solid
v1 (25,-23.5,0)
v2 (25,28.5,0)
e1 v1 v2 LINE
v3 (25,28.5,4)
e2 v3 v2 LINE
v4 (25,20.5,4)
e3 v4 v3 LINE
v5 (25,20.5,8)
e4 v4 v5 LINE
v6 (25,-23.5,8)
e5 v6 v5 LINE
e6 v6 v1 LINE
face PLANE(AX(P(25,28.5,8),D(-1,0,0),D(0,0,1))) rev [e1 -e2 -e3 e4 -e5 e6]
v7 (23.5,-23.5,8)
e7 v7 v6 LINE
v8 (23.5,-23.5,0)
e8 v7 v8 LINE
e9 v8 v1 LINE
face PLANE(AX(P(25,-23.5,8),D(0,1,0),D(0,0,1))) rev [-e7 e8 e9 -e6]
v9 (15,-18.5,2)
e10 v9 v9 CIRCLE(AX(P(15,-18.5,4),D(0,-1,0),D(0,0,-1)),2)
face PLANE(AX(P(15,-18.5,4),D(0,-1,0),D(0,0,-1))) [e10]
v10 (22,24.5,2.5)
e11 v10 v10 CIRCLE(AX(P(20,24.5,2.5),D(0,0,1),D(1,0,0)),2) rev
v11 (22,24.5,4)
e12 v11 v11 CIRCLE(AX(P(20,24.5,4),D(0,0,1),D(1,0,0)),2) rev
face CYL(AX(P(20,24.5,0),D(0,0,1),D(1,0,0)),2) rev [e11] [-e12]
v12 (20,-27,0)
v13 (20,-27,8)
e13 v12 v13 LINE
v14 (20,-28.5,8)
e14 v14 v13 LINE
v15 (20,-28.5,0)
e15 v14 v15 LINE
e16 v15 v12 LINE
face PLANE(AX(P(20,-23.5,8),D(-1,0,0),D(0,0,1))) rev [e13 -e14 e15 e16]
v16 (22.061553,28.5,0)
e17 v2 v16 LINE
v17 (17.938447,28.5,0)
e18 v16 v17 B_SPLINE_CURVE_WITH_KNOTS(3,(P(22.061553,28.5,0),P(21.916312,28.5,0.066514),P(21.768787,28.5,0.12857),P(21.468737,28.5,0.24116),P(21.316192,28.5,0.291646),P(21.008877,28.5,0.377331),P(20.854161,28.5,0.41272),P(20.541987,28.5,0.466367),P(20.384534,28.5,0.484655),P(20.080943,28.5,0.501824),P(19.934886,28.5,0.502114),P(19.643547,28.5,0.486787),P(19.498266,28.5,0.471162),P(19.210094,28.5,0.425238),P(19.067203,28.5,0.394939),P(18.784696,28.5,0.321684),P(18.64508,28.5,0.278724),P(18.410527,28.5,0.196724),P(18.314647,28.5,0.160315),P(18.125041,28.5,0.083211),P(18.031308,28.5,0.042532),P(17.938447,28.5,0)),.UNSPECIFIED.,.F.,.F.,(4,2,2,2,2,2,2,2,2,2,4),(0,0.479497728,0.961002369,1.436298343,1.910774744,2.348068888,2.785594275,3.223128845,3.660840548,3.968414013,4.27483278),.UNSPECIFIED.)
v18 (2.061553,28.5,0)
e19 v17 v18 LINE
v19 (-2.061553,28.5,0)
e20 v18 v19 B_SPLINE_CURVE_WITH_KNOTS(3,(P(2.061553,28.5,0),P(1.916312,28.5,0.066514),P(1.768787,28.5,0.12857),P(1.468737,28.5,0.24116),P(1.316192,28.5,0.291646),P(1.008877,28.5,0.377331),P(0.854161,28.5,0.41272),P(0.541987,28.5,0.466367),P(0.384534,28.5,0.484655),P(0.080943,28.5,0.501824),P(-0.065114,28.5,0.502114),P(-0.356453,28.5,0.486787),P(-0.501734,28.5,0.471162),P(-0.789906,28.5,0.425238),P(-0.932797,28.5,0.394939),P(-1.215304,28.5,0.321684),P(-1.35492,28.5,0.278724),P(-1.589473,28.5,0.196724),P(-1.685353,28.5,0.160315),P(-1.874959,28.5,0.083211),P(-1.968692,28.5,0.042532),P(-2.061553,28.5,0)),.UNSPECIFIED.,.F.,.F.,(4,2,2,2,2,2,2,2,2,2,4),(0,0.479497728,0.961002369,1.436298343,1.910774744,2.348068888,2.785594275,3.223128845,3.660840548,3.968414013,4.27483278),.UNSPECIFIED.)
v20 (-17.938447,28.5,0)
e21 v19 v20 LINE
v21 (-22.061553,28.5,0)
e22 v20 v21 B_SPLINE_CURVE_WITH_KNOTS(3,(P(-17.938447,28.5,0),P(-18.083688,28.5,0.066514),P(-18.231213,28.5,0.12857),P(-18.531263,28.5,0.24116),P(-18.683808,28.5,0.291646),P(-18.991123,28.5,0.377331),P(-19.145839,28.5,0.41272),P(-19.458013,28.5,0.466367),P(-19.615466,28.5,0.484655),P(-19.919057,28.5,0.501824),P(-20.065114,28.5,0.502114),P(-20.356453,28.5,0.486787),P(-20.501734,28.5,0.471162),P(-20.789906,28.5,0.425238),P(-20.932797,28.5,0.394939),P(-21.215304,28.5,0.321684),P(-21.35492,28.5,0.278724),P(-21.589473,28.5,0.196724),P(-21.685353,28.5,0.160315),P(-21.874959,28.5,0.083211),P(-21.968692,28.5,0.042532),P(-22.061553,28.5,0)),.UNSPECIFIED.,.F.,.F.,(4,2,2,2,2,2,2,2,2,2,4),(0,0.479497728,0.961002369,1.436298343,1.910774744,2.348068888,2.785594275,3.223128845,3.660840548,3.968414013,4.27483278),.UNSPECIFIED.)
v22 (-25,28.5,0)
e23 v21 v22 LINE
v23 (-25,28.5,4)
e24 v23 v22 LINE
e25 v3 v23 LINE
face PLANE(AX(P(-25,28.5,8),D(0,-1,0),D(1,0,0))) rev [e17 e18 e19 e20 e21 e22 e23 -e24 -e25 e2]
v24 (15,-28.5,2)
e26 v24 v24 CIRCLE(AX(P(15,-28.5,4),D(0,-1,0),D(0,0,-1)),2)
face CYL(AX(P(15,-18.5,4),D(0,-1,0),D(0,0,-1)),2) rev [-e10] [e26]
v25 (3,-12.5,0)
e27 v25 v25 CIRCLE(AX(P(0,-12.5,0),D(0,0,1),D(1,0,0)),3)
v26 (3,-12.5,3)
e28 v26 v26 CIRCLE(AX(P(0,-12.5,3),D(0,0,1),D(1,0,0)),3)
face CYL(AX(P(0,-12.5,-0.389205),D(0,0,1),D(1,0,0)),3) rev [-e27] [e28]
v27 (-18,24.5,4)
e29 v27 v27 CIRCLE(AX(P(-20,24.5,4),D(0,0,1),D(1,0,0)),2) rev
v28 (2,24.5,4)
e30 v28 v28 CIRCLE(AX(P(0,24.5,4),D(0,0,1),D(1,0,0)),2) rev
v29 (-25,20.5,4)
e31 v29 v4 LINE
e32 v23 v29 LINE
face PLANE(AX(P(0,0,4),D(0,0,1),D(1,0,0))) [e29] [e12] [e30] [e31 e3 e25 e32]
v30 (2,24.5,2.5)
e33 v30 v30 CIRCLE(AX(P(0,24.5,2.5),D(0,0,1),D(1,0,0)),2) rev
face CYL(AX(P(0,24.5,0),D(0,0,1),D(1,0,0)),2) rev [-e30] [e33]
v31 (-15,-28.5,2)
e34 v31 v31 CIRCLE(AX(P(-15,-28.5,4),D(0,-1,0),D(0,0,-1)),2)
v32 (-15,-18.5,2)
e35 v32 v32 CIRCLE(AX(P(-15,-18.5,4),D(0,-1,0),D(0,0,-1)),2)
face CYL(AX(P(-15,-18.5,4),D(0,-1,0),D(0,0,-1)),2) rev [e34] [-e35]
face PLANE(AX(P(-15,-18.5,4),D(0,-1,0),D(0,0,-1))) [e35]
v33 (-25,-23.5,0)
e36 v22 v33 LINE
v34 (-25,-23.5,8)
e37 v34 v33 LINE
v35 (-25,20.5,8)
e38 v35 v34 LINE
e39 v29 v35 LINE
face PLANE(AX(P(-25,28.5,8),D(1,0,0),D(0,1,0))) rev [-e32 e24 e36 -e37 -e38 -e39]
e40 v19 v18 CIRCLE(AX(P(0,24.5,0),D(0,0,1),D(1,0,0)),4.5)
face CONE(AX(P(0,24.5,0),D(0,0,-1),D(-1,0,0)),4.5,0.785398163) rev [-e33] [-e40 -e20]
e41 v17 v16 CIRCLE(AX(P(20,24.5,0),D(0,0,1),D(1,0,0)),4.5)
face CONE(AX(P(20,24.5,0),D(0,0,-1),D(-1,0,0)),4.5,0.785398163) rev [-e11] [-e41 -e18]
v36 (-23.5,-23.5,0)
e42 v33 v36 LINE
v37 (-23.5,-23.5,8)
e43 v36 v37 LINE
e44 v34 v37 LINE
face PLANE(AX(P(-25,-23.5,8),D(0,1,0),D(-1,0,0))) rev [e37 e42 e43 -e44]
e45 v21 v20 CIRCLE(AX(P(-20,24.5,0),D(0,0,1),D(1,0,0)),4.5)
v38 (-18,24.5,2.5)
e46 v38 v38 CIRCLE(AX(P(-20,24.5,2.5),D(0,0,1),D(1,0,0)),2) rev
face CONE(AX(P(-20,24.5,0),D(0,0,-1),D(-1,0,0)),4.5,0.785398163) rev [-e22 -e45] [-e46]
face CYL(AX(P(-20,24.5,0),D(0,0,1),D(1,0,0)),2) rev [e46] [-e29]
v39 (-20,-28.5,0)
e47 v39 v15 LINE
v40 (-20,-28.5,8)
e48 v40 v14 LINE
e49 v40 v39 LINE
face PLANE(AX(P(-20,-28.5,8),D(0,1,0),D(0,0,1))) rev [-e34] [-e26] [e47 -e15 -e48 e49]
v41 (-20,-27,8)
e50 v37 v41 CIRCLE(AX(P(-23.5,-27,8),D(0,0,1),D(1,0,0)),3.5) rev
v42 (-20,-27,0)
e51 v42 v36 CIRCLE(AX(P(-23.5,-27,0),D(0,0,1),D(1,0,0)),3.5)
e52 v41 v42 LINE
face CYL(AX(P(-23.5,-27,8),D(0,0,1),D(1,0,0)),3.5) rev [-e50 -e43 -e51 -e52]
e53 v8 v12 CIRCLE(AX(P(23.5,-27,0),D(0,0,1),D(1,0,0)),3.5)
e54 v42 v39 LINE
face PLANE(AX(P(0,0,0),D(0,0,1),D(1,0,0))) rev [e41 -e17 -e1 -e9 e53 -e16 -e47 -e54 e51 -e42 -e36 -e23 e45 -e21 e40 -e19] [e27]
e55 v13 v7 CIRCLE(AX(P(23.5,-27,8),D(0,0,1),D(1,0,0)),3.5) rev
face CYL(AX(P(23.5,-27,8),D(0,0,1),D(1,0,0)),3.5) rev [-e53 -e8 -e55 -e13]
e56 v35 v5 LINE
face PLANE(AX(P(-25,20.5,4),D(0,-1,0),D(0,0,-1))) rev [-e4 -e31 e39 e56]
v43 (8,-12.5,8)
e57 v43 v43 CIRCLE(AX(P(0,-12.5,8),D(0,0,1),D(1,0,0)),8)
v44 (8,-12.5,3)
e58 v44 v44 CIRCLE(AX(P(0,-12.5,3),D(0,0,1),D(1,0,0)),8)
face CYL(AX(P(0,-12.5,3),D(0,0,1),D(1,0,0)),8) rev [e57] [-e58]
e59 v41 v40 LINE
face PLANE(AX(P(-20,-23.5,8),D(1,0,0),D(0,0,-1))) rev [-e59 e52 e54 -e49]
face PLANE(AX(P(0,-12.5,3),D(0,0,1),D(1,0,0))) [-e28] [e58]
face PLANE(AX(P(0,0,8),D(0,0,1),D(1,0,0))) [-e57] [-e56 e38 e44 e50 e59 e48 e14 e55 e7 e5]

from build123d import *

# Parameters (mm, degrees)
BOSS_EXTRU_1_DEPTH      = 8
ESQUISSE2_R             = 2
ENL_V_MAT_EXTRU_1_DEPTH = 10
ESQUISSE3_R             = 2
ENL_V_MAT_EXTRU_2_DEPTH = 39.745967532
CHANFREIN1_SIZE         = 2.5
ESQUISSE4_R             = 8
ENL_V_MAT_EXTRU_3_DEPTH = 5
ESQUISSE5_R             = 3
ENL_V_MAT_EXTRU_4_DEPTH = 39.23937761
ESQUISSE6_W             = 50
ESQUISSE6_H             = 8
ENL_V_MAT_EXTRU_5_DEPTH = 4
CONG_1_R                = 3.5


with BuildPart() as part:
    # Esquisse1 → Boss.-Extru.1 (new body)
    with BuildSketch(Plane.XY):
        Polygon((-25, -23.5), (-20, -23.5), (-20, -28.5), (20, -28.5), (20, -23.5), (25, -23.5), (25, 28.5), (-25, 28.5), align=None)
    extrude(amount=BOSS_EXTRU_1_DEPTH)

    # Esquisse2 → Enlèv. mat.-Extru.1 (cut)
    with BuildSketch(Plane.XZ.offset(28.5)):
        with Locations(Location((-15, 4, 0), (0, 0, 270))):
            Circle(ESQUISSE2_R)
        with Locations(Location((15, 4, 0), (0, 0, 270))):
            Circle(ESQUISSE2_R)
    extrude(amount=-ENL_V_MAT_EXTRU_1_DEPTH, mode=Mode.SUBTRACT)

    # Esquisse3 → Enlèv. mat.-Extru.2 (cut, through all)
    with BuildSketch(Plane.XY.offset(8)):
        with Locations((-20, 24.5)):
            Circle(ESQUISSE3_R)
        with Locations((20, 24.5)):
            Circle(ESQUISSE3_R)
        with Locations((0, 24.5)):
            Circle(ESQUISSE3_R)
    extrude(amount=-ENL_V_MAT_EXTRU_2_DEPTH, mode=Mode.SUBTRACT)

    # Chanfrein1
    # the kernel refuses this chamfer: 2.5 mm, written as the material it takes off along each edge
    with BuildSketch(Plane(origin=(-20, 24.5, 0), x_dir=(1, 0, 0), z_dir=(0, -1, 0))) as chanfrein1_piece_1:
        Polygon((2 + CHANFREIN1_SIZE, 0), (2, CHANFREIN1_SIZE), (2, 0), align=None)
    revolve(axis=Axis((-20, 24.5, 0), (0, 0, 1)), mode=Mode.SUBTRACT)
    with BuildSketch(Plane(origin=(20, 24.5, 0), x_dir=(1, 0, 0), z_dir=(0, -1, 0))) as chanfrein1_piece_2:
        Polygon((2 + CHANFREIN1_SIZE, 0), (2, CHANFREIN1_SIZE), (2, 0), align=None)
    revolve(axis=Axis((20, 24.5, 0), (0, 0, 1)), mode=Mode.SUBTRACT)
    with BuildSketch(Plane(origin=(0, 24.5, 0), x_dir=(1, 0, 0), z_dir=(0, -1, 0))) as chanfrein1_piece_3:
        Polygon((2 + CHANFREIN1_SIZE, 0), (2, CHANFREIN1_SIZE), (2, 0), align=None)
    revolve(axis=Axis((0, 24.5, 0), (0, 0, 1)), mode=Mode.SUBTRACT)

    # Esquisse4 → Enlèv. mat.-Extru.3 (cut)
    with BuildSketch(Plane.XY.offset(8)):
        with Locations((0, -12.5)):
            Circle(ESQUISSE4_R)
    extrude(amount=-ENL_V_MAT_EXTRU_3_DEPTH, mode=Mode.SUBTRACT)

    # Esquisse5 → Enlèv. mat.-Extru.4 (cut, through all)
    with BuildSketch(Plane.XY.offset(3)):
        with Locations((0, -12.5)):
            Circle(ESQUISSE5_R)
    extrude(amount=-ENL_V_MAT_EXTRU_4_DEPTH, mode=Mode.SUBTRACT)

    # Esquisse6 → Enlèv. mat.-Extru.5 (cut)
    with BuildSketch(Plane.XY.offset(8)):
        with Locations((0, 24.5)):
            Rectangle(ESQUISSE6_W, ESQUISSE6_H)
    extrude(amount=-ENL_V_MAT_EXTRU_5_DEPTH, mode=Mode.SUBTRACT)

    # Congé1
    cong_1_edges = [part.edges().sort_by_distance(p)[0] for p in [
        (20, -23.5, 4),
        (-20, -23.5, 4),
    ]]
    fillet(cong_1_edges, radius=CONG_1_R)


solid = part.part
